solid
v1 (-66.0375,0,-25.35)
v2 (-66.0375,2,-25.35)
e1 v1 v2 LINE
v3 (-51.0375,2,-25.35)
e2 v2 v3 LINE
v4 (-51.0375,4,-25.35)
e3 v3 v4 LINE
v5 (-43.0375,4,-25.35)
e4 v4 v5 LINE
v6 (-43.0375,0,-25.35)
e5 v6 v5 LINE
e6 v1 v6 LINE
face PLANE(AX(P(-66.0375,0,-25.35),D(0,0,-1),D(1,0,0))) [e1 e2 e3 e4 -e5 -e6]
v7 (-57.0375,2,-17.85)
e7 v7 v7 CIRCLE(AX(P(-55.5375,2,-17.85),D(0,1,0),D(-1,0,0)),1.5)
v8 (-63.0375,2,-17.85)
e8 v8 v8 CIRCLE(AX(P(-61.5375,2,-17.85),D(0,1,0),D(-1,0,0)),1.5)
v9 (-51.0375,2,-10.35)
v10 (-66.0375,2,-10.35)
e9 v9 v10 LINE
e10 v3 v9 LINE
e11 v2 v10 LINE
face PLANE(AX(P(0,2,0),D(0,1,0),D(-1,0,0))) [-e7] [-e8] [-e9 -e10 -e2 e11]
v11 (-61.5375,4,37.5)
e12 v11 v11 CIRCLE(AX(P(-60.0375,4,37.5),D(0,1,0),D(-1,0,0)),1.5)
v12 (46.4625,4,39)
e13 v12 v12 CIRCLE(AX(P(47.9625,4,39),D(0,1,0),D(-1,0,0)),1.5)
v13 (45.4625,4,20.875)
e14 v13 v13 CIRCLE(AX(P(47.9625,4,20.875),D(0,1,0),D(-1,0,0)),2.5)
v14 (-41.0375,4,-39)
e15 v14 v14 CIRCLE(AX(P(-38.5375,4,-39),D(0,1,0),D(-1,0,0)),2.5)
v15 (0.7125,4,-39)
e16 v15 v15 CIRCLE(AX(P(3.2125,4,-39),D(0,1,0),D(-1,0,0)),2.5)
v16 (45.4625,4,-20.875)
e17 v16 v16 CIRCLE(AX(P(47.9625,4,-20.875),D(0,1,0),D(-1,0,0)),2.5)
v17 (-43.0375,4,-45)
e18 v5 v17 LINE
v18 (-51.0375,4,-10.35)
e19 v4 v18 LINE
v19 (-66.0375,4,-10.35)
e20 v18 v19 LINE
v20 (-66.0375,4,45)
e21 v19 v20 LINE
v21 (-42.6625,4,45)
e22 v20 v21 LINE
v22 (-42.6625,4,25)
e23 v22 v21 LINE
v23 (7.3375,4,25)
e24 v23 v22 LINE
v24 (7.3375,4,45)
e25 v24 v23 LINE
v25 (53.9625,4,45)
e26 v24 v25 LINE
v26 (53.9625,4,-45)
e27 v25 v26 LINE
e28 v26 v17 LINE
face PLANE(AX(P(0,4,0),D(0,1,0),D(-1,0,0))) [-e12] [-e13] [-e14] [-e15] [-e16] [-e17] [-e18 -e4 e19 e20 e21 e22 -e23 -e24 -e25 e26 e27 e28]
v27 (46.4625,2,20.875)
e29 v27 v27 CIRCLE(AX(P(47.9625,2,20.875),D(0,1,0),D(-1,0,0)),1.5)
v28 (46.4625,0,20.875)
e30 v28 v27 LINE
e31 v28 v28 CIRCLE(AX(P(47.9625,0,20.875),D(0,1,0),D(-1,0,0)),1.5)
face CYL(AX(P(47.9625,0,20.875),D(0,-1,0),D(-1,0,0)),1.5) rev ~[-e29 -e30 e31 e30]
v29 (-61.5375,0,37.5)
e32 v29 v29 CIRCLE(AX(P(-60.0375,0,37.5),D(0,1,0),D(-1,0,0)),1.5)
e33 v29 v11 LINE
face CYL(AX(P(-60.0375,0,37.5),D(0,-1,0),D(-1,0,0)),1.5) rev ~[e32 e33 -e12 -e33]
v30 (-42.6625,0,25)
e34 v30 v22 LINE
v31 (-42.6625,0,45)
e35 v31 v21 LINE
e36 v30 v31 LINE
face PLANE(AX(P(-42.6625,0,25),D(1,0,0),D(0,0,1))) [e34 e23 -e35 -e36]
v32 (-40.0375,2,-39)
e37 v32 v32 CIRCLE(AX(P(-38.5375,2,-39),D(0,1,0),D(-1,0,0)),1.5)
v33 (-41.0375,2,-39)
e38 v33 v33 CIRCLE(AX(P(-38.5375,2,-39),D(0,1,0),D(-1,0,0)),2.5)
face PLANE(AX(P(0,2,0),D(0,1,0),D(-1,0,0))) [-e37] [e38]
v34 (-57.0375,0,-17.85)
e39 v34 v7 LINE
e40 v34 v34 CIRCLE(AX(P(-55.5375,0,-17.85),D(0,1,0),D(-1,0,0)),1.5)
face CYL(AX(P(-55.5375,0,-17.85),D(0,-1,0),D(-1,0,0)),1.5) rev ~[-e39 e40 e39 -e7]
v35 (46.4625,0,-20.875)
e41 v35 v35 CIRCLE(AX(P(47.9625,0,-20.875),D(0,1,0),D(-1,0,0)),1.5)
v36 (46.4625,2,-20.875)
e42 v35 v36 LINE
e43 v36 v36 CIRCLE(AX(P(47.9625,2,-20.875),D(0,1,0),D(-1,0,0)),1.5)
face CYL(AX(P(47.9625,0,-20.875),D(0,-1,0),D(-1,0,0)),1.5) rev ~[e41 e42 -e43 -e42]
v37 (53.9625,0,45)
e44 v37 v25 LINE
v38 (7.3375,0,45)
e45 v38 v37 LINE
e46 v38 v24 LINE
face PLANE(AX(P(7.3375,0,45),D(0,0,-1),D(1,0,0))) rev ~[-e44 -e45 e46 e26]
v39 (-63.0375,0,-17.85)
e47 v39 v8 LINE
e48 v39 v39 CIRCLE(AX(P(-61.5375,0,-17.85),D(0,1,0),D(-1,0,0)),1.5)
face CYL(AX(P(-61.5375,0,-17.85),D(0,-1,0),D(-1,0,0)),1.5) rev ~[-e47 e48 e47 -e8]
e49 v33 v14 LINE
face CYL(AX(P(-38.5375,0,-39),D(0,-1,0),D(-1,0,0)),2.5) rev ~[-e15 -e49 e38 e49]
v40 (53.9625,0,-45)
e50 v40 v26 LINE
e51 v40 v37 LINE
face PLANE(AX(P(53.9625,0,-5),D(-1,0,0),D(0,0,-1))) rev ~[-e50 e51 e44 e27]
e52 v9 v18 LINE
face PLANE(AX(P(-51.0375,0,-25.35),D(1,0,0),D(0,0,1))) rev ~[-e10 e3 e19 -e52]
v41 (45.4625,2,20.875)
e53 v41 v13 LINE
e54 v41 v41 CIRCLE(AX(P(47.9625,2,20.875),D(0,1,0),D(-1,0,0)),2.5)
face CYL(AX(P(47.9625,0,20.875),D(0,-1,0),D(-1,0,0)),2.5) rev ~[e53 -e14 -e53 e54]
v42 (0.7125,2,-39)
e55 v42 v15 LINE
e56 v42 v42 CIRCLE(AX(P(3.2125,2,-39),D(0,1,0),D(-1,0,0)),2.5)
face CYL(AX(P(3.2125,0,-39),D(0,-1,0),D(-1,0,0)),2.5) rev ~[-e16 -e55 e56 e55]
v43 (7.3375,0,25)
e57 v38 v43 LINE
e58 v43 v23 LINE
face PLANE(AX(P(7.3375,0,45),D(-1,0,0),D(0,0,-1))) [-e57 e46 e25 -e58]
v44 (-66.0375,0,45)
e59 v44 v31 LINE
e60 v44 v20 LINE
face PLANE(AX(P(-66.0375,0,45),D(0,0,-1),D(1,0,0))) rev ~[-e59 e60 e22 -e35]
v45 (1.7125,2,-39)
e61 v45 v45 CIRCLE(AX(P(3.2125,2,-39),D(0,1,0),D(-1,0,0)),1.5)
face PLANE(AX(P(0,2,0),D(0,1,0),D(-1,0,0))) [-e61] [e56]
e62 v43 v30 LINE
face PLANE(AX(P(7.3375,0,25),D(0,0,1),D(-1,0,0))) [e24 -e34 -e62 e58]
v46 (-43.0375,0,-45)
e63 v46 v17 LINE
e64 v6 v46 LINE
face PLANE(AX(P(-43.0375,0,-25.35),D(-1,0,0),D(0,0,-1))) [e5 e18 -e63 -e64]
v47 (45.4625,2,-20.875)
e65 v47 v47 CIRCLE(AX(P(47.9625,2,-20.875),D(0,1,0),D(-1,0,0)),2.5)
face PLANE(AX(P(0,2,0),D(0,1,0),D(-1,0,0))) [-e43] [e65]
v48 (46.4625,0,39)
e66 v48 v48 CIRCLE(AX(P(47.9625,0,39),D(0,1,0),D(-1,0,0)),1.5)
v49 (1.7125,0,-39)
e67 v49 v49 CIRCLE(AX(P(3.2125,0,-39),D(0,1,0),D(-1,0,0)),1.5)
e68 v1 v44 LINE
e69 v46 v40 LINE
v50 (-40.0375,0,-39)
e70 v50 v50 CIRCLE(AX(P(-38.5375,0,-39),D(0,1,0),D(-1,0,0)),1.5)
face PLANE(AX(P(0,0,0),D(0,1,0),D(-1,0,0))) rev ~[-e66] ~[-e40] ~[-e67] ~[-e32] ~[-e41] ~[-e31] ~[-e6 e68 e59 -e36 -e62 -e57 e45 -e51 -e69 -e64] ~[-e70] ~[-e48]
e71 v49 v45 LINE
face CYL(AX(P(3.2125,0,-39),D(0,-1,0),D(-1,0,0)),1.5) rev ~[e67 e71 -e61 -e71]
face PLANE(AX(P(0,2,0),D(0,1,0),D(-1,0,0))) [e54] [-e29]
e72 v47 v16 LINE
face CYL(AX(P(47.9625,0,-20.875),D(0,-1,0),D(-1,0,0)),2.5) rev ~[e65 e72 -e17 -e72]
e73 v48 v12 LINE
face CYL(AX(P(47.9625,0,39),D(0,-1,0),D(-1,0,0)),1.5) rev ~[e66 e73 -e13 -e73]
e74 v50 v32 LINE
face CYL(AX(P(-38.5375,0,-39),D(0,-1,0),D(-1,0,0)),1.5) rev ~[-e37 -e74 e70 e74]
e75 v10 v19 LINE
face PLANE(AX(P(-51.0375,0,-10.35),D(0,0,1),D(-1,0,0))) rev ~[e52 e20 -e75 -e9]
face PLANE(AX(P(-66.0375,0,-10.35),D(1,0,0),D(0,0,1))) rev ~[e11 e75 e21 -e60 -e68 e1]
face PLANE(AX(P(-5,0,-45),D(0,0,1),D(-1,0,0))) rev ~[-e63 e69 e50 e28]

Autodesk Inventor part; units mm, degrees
ref_plane "YZ Plane" through (0, 0, 0) normal (1, 0, 0) x (0, 1, 0)
ref_plane "XZ Plane" through (0, 0, 0) normal (0, 1, 0) x (-1, 0, 0)
ref_plane "XY Plane" through (0, 0, 0) normal (0, 0, 1) x (1, 0, 0)
sketch "Sketch1" plane through (0, 0, 0) normal (0, 1, 0) x (-1, 0, 0)
  line L0 (66.0375, 45) -> (-53.9625, 45)
  line L1 (-53.9625, 45) -> (-53.9625, -45)
  line L2 (66.0375, -45) -> (66.0375, 45)
  line L3 (-53.9625, -45) -> (-5, -45)
  line L4 (5, -45) -> (66.0375, -45)
  line L5 (-53.9625, 0) -> (-53.9625, -5)
  line L6 (-53.9625, -5) -> (-53.9625, 5)
  line L7 (30.1625, 20) -> (5.1625, 20)
  line L8 (5.1625, 20) -> (5.1625, 0)
  line L9 (5.1625, 0) -> (30.1625, 0)
  line L10 (30.1625, 0) -> (30.1625, 20)
  line L11 (32.6625, -3) -> (17.6625, -3)
  line L12 (17.6625, -3) -> (17.6625, -33)
  line L13 (17.6625, -33) -> (32.6625, -33)
  line L14 (32.6625, -33) -> (32.6625, -3)
  circle A0 centre (23.6625, 10) radius 1.5
  circle A1 centre (11.6625, 10) radius 1.5
  circle A2 centre (25.1625, -12) radius 1.5
  circle A3 centre (25.1625, -24) radius 1.5
  line L15 (2.6625, -3) -> (17.6625, -3)
  line L16 (17.6625, -3) -> (17.6625, -33)
  line L17 (17.6625, -33) -> (2.6625, -33)
  line L18 (2.6625, -33) -> (2.6625, -3)
  circle A4 centre (10.1625, -12) radius 1.5
  circle A5 centre (10.1625, -24) radius 1.5
  line L19 (42.6625, 45) -> (-7.3375, 45)
  line L20 (-7.3375, 45) -> (-7.3375, 25)
  line L21 (-7.3375, 25) -> (42.6625, 25)
  line L22 (42.6625, 25) -> (42.6625, 45)
  line L23 (5, -45) -> (-5, -45)
  circle A6 centre (-3.2125, -39) radius 1.5
  circle A7 centre (-3.2125, -39) radius 2.5
  circle A8 centre (38.5375, -39) radius 1.5
  circle A9 centre (38.5375, -39) radius 2.5
  circle A10 centre (-47.9625, 39) radius 1.5
  circle A11 centre (60.0375, 37.5) radius 1.5
  line L24 (66.0375, -45) -> (51.0375, -45)
  line L25 (66.0375, -28) -> (66.0375, -45)
  line L26 (66.0375, -25.35) -> (51.0375, -25.35)
  line L27 (51.0375, -25.35) -> (51.0375, -10.35)
  line L28 (51.0375, -10.35) -> (66.0375, -10.35)
  line L29 (66.0375, -10.35) -> (66.0375, -25.35)
  circle A12 centre (61.5375, -17.85) radius 1.5
  circle A13 centre (61.5375, -17.85) radius 2.5
  circle A14 centre (55.5375, -17.85) radius 1.5
  circle A15 centre (55.5375, -17.85) radius 2.5
  circle A16 centre (-47.9625, 20.875) radius 1.5
  circle A17 centre (-47.9625, -20.875) radius 1.5
  line L30 (-39.6875, 0) -> (-58.7375, 0) construction
  circle A18 centre (-47.9625, 20.875) radius 2.5
  circle A19 centre (-47.9625, -20.875) radius 2.5
  line L31 (17.6625, 0) -> (17.6625, -35.175) construction
  line L32 (51.0375, -25.35) -> (43.0375, -25.35)
  line L33 (43.0375, -25.35) -> (43.0375, -45)
  point P0 (0, 0)
  point P1 (5.1625, 10)
  point P2 (25.1625, -33)
  point P3 (8.375, -33)
  point P4 (-7.3375, 45)
  point P5 (46.0375, -45)
  dimension "d0" = 120
  dimension "d1" = 90
  dimension "d21" = 3
  dimension "d22" = 6.5
  dimension "d23" = 3
  dimension "d24" = 6.5
  dimension "d25" = 3
  dimension "d27" = 3
  dimension "d32" = 5
  dimension "d38" = 3
  dimension "d39" = 5
  dimension "d40" = 6
  dimension "d41" = 5
  dimension "d42" = 3
  dimension "d43" = 6
  dimension "d44" = 6
  dimension "d45" = 3
  dimension "d46" = 6
  dimension "d59" = 19.65
  dimension "d60" = 3
  dimension "d61" = 5
  dimension "d63" = 7.5
  dimension "d68" = 3
  dimension "d69" = 3
  dimension "d70" = 20.875
  dimension "d71" = 20.875
  dimension "d72" = 5
  dimension "d73" = 5
  dimension "d74" = 0
  dimension "d75" = 0
  dimension "d76" = 7.5
  dimension "d77" = 7.5
  dimension "d78" = 7.5
  dimension "d79" = 7.5
  dimension "d81" = 8
extrude "Extrusion3" add sketch "Sketch1" along normal blind 4 contours L2 L28 L27 L32 L33 L4 L23 L3 L1 L0 L20 L21 L22 | L10 L9 L8 L7 | L14 L13 L12 L11 | L12 L17 L18 L15 | A0 | A1 | A2 | A3 | A4 | A5
extrude "Extrusion4" add sketch "Sketch1" along normal blind 2 contours L2 L26 L27 L28 | L10 L9 L8 L7 | L14 L13 L12 L11 | L12 L17 L18 L15 | A7 | A9 | A13 | A15 | A18 | A19
properties part number "Casis Kiri Atas_3DPrint"
